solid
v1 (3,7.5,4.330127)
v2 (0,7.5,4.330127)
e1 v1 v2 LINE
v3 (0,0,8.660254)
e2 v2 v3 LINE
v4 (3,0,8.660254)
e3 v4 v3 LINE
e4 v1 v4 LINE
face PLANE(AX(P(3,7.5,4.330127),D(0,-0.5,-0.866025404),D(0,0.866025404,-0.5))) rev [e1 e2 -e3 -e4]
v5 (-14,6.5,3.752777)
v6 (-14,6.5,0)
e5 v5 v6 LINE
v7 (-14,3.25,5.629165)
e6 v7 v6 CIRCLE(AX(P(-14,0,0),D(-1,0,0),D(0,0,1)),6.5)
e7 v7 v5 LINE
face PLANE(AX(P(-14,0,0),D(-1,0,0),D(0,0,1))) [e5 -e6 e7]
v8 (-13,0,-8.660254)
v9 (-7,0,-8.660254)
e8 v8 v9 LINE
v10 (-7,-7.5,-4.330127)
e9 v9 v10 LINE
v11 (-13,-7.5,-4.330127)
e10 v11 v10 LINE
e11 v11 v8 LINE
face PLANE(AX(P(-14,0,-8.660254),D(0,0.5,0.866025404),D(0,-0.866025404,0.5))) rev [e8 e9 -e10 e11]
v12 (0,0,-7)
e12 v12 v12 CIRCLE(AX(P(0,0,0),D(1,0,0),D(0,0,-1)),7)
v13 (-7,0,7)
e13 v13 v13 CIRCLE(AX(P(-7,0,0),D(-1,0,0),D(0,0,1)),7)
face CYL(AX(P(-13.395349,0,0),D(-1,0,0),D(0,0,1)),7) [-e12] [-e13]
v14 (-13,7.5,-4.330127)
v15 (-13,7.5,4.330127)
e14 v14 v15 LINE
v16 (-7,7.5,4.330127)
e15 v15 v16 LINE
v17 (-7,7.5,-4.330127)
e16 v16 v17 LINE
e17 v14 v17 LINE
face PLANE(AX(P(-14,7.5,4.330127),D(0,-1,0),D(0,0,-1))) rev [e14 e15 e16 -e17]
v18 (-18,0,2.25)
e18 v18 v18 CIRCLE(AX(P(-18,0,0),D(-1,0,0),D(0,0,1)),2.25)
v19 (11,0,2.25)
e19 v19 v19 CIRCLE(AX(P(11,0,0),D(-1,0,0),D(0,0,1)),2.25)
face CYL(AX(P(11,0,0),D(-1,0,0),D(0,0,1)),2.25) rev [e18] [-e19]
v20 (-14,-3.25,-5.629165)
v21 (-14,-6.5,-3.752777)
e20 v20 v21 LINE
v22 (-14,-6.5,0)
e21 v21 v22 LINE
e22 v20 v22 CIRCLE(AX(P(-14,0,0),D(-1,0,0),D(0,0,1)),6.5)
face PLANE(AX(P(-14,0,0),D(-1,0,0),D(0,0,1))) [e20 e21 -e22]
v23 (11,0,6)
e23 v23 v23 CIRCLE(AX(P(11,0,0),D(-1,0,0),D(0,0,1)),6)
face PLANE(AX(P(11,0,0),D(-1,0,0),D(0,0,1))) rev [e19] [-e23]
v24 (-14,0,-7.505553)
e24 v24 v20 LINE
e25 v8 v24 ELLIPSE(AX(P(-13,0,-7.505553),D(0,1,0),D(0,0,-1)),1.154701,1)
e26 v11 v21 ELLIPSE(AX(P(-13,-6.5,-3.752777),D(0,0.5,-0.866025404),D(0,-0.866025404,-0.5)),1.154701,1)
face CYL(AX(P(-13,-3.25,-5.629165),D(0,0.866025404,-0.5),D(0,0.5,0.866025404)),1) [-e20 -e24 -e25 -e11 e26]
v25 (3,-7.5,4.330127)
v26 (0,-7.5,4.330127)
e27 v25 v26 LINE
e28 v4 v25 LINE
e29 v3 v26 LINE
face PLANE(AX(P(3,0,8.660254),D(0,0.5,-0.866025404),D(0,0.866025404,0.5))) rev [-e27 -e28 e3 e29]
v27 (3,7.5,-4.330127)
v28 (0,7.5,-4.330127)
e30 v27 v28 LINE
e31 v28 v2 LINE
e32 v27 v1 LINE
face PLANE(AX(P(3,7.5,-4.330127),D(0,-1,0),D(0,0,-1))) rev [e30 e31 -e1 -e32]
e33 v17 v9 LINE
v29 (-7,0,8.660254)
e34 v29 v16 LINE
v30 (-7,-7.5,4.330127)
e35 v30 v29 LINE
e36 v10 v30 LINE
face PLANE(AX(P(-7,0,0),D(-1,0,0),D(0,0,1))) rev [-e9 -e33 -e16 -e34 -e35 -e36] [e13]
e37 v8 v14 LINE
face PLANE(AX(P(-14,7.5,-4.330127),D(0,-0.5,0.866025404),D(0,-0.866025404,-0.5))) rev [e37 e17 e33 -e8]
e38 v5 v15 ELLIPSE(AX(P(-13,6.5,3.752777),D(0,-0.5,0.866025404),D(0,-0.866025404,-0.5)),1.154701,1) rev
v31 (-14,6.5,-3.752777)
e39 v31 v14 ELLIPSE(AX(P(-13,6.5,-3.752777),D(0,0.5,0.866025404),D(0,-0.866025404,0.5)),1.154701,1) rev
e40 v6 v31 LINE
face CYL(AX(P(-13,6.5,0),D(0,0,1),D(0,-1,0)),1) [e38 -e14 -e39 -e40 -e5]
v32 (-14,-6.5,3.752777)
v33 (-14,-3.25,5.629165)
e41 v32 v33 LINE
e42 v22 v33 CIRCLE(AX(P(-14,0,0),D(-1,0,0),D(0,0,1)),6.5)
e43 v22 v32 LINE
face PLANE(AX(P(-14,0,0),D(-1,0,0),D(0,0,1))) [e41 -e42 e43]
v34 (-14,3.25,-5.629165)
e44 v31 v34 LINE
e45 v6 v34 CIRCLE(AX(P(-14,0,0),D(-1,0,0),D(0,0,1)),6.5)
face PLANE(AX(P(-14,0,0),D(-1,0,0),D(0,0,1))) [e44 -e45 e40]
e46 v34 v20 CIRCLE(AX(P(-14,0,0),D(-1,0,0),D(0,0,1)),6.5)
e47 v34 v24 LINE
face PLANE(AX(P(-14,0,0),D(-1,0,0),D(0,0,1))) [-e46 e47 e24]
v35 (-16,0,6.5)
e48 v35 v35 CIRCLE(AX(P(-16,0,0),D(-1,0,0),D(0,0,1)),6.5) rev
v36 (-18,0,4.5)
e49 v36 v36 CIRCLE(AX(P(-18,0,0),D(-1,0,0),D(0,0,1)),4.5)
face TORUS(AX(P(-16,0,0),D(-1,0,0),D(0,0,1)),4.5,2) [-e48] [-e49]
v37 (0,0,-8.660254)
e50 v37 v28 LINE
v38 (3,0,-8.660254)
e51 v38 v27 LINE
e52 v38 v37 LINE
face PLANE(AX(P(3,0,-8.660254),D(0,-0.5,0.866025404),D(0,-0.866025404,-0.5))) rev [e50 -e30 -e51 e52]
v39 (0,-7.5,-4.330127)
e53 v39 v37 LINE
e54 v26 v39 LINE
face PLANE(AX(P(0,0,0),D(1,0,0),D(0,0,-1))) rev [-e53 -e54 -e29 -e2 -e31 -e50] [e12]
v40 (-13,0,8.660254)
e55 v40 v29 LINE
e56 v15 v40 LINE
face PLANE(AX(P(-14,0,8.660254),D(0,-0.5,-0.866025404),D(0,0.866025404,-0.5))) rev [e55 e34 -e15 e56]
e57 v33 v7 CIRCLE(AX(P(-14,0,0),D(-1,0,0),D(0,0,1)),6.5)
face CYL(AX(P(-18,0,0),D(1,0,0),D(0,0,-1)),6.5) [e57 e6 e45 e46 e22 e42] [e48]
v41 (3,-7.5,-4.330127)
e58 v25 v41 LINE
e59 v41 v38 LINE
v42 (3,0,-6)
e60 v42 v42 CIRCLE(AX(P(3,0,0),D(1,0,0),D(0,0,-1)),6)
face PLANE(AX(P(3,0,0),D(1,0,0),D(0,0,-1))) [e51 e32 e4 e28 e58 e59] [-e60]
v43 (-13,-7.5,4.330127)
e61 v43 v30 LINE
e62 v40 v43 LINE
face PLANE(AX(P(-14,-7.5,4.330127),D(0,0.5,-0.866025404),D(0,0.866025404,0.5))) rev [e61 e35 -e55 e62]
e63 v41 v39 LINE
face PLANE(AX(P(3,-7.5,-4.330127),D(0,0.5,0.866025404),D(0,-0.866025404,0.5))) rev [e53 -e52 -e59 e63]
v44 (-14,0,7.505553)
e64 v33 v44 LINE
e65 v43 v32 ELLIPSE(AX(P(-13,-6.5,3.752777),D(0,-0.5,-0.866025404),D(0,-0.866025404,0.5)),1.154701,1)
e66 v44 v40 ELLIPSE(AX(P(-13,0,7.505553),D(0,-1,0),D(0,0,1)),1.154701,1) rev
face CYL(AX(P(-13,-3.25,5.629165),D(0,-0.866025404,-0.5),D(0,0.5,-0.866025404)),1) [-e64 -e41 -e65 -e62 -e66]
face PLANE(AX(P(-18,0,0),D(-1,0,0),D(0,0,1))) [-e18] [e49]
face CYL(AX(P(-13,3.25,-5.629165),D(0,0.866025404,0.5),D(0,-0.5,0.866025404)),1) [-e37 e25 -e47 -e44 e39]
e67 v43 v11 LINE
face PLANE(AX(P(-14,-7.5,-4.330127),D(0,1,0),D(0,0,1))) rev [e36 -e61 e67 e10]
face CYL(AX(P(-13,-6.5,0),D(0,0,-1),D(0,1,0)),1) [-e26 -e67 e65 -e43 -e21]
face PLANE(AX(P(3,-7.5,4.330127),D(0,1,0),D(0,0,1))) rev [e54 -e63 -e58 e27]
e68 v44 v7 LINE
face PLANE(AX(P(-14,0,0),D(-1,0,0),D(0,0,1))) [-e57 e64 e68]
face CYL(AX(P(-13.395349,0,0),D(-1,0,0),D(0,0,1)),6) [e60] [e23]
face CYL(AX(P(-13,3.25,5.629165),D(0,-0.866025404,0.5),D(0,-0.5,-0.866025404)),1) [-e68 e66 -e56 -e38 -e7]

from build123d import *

# Parameters (mm, degrees)
BOSS_EXTRUDE1_DEPTH = 3
BOSS_EXTRUDE2_DEPTH = 7
SKETCH4_R           = 6.5
BOSS_EXTRUDE3_DEPTH = 4
FILLET1_R           = 2
FILLET2_R           = 1
SKETCH5_R           = 2.25
CUT_EXTRUDE1_DEPTH  = 32.180923655


with BuildPart() as part:
    # Sketch1 → Revolve1 (revolve)
    with BuildSketch(Plane.XY, mode=Mode.PRIVATE) as revolve1_sk:
        Polygon((11, 0), (11, 6), (0, 6), (0, 7), (-7, 7), (-7, 0), align=None)
    revolve(revolve1_sk.sketch.rotate(Axis((-13.395348837, 0, 0), (1, 0, 0)), 90), axis=Axis((-13.395348837, 0, 0), (1, 0, 0)))

    # Sketch2 → Boss-Extrude1 (add)
    with BuildSketch(Plane(origin=(0, 0, 0), x_dir=(0, 0, -1), z_dir=(1, 0, 0))):
        Polygon((4.330127019, -7.5), (8.660254038, 0), (4.330127019, 7.5), (-4.330127019, 7.5), (-8.660254038, 0), (-4.330127019, -7.5), align=None)
    extrude(amount=BOSS_EXTRUDE1_DEPTH)

    # Sketch3 → Boss-Extrude2 (add)
    with BuildSketch(Plane.ZY.offset(7)):
        Polygon((4.330127019, -7.5), (8.660254038, 0), (4.330127019, 7.5), (-4.330127019, 7.5), (-8.660254038, 0), (-4.330127019, -7.5), align=None)
    extrude(amount=BOSS_EXTRUDE2_DEPTH)

    # Sketch4 → Boss-Extrude3 (add)
    with BuildSketch(Plane.ZY.offset(14)):
        Circle(SKETCH4_R)
    extrude(amount=BOSS_EXTRUDE3_DEPTH)

    # Fillet1
    fillet1_edges = [part.edges().sort_by_distance(p)[0] for p in [
        (-18, 0, -6.5),
    ]]
    fillet(fillet1_edges, radius=FILLET1_R)

    # Fillet2
    fillet2_edges = [part.edges().sort_by_distance(p)[0] for p in [
        (-14, -7.5, 0),
        (-14, -3.75, 6.495190528),
        (-14, 3.75, 6.495190528),
        (-14, 7.5, 0),
        (-14, 3.75, -6.495190528),
        (-14, -3.75, -6.495190528),
    ]]
    fillet(fillet2_edges, radius=FILLET2_R - 0.0001)  # a hair under: the kernel refuses the full size

    # Sketch5 → Cut-Extrude1 (cut, through all)
    with BuildSketch(Plane.ZY.offset(18)):
        Circle(SKETCH5_R)
    extrude(amount=-CUT_EXTRUDE1_DEPTH, mode=Mode.SUBTRACT)


solid = part.part
